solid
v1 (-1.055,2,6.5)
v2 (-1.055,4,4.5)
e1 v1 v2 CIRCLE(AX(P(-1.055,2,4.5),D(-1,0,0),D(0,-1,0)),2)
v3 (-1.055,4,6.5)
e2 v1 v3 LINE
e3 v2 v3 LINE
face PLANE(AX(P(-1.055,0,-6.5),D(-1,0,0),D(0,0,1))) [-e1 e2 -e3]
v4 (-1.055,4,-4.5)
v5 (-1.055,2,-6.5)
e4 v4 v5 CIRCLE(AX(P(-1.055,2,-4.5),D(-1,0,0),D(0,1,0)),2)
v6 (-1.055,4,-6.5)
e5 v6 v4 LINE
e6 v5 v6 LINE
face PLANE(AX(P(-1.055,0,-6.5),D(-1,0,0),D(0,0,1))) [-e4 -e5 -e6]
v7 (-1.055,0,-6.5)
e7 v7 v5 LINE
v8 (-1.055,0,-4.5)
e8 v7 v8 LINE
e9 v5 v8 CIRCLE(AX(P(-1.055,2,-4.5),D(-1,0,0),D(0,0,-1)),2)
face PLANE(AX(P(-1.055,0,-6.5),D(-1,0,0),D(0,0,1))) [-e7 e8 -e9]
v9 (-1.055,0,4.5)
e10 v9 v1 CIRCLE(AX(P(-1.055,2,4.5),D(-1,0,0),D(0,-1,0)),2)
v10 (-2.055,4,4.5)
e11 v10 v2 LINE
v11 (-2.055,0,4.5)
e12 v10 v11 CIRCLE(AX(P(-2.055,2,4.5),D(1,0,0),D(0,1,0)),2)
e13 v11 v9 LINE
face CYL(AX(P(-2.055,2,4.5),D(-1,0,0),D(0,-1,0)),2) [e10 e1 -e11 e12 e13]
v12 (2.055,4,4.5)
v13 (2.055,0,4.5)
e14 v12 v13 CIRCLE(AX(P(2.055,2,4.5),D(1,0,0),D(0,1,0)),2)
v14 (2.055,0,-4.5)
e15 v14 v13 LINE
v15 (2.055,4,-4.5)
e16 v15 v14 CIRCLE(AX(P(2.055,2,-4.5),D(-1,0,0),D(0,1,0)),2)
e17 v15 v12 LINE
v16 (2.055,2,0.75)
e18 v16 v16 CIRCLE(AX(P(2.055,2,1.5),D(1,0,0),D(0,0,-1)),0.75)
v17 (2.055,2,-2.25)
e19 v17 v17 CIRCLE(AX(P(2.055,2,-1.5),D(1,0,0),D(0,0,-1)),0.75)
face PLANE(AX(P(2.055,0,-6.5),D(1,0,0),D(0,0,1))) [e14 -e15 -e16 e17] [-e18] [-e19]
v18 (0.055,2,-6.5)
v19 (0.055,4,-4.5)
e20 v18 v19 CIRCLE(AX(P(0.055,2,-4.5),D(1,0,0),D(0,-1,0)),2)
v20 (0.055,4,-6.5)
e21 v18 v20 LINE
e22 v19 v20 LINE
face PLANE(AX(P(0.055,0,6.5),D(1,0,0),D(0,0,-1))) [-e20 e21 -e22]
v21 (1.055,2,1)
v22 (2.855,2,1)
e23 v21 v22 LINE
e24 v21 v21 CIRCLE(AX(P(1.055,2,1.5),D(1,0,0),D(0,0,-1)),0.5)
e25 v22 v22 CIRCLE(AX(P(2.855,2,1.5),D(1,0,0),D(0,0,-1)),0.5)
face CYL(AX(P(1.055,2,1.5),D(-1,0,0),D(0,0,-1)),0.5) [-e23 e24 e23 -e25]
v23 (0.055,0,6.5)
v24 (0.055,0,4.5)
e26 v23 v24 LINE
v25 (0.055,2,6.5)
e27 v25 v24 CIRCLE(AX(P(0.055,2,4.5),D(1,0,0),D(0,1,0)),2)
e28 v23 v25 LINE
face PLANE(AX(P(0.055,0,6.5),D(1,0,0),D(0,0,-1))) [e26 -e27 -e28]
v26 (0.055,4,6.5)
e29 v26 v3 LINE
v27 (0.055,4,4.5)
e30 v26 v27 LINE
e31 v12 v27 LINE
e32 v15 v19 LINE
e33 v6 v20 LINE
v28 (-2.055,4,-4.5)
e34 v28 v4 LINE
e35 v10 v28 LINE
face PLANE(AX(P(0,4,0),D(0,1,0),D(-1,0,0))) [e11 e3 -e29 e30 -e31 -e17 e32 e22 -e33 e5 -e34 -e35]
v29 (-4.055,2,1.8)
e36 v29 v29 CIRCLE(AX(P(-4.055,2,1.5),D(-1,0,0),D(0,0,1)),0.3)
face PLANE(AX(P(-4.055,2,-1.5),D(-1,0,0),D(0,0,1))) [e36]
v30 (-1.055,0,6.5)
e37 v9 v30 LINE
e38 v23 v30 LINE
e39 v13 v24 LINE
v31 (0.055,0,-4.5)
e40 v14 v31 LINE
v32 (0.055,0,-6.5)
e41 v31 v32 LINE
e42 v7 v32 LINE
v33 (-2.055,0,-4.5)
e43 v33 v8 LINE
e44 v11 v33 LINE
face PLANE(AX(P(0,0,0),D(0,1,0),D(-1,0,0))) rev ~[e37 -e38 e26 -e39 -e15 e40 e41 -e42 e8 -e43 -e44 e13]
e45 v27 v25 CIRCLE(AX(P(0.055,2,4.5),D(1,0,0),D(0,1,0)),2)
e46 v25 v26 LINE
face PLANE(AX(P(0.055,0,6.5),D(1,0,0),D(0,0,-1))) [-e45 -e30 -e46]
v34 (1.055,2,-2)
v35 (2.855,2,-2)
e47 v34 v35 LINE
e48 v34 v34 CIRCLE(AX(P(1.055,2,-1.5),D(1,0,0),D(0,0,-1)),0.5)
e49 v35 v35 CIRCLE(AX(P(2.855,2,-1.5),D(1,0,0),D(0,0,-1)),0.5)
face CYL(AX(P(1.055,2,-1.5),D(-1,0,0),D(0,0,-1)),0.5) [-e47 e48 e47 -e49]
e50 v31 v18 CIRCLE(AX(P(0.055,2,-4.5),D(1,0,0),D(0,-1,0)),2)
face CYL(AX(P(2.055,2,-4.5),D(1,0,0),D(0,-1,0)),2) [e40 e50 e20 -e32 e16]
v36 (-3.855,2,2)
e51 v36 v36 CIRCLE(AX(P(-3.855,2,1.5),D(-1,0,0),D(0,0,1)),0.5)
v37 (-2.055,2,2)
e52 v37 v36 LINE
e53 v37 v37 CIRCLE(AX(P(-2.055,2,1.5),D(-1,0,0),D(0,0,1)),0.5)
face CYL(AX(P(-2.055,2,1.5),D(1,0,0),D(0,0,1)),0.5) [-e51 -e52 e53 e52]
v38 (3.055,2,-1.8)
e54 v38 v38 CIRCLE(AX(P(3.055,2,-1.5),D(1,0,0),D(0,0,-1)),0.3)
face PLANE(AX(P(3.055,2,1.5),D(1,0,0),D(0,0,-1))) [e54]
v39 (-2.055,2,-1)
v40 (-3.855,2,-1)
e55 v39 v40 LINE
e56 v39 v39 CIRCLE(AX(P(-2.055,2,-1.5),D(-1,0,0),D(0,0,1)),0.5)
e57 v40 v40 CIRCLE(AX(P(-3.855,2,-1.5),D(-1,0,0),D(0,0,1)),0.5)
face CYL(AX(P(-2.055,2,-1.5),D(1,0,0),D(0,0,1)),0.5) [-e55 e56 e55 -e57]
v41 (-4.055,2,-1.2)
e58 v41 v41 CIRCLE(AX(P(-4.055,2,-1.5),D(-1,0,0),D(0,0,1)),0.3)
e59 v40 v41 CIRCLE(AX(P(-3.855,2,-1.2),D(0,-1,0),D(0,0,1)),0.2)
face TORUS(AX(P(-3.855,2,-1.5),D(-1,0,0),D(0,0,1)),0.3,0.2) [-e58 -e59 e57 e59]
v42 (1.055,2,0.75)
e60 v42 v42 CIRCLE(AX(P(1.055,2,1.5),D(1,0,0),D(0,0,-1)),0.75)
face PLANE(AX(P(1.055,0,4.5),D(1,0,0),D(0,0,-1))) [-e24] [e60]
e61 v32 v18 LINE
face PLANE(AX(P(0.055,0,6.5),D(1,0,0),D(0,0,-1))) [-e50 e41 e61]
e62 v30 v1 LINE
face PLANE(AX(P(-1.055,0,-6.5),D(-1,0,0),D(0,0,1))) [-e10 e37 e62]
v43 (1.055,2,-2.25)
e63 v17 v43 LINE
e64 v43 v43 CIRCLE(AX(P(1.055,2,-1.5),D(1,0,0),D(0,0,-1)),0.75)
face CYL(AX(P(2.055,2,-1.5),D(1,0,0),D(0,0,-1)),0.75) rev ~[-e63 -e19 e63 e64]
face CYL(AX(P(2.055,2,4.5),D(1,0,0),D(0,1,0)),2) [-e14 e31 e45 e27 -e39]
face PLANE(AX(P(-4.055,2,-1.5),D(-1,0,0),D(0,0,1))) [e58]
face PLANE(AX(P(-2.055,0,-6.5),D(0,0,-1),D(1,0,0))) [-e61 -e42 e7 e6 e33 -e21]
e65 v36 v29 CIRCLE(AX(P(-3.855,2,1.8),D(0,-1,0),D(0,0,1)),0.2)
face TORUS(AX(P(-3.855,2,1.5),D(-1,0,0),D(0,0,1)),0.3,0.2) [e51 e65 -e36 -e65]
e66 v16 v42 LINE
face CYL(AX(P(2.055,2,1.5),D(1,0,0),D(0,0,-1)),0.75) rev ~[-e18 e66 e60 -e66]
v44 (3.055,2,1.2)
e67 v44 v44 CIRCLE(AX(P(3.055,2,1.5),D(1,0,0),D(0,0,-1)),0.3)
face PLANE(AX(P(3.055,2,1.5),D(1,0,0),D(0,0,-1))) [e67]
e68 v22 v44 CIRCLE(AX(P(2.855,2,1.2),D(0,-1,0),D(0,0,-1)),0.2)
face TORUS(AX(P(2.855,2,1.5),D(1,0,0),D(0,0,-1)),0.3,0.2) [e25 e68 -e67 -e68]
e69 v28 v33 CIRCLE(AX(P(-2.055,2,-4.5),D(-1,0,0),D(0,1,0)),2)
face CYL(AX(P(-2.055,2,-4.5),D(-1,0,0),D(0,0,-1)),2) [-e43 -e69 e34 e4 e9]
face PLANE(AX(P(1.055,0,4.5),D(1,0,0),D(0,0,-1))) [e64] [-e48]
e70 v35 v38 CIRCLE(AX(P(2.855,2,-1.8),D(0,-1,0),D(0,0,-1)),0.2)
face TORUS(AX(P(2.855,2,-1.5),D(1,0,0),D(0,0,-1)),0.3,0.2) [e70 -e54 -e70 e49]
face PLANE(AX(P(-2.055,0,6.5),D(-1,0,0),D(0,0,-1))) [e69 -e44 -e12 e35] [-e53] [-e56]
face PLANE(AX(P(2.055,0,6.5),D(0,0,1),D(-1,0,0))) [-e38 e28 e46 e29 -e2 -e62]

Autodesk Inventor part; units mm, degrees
ref_plane "YZ Plane" through (0, 0, 0) normal (1, 0, 0) x (0, 1, 0)
ref_plane "XZ Plane" through (0, 0, 0) normal (0, 1, 0) x (-1, 0, 0)
ref_plane "XY Plane" through (0, 0, 0) normal (0, 0, 1) x (1, 0, 0)
sketch "Sketch1" plane through (0, 0, 0) normal (0, 1, 0) x (-1, 0, 0)
  line L0 (-2.055, 6.5) -> (2.055, 6.5)
  line L1 (2.055, 6.5) -> (2.055, -6.5)
  line L2 (2.055, -6.5) -> (-2.055, -6.5)
  line L3 (-2.055, -6.5) -> (-2.055, 6.5)
  line L4 (-2.055, 6.5) -> (2.055, -6.5) construction
  line L5 (2.055, 6.5) -> (-2.055, -6.5) construction
  point P0 (0, 0)
  dimension "d0" = 4.11
  dimension "d1" = 13
extrude "Extrusion1" add sketch "Sketch1" along normal blind 4
sketch "Sketch2" plane through (2.055, 0, 6.5) normal (1, 0, 0) x (0, 0, -1)
  line L0 (0, 0) -> (0, 4) projected
  line L1 (0, 2) -> (13, 2) construction
  line L2 (13, 0) -> (13, 4) projected
  line L3 (2, 0) -> (11, 0)
  line L4 (11, 4) -> (2, 4)
  arc A0 (2, 4) -> (2, 0) centre (2, 2) ccw
  arc A1 (11, 0) -> (11, 4) centre (11, 2) ccw
  line L5 (0, 4) -> (13, 4) projected
  line L6 (0, 0) -> (13, 0) projected
  point P0 (6.5, 0)
  point P1 (6.5, 2)
extrude "Extrusion2" cut sketch "Sketch2" against normal blind 2 contours L0 A0 L6 | L0 L5 A0 | A1 L2 L6 | L5 L2 A1
sketch "Sketch3" plane through (-2.055, 0, -6.5) normal (-1, 0, 0) x (0, 0, 1)
  arc A0 (2, 4) -> (0, 2) centre (2, 2) ccw projected
  line L0 (0, 0) -> (0, 4) projected
  line L1 (0, 4) -> (13, 4) projected
  arc A1 (0, 2) -> (2, 0) centre (2, 2) ccw projected
  arc A2 (2, 4) -> (2, 0) centre (2, 2) ccw projected
  line L2 (11, 4) -> (2, 4) projected
  arc A3 (11, 0) -> (11, 4) centre (11, 2) ccw projected
  line L3 (11, 0) -> (2, 0) projected
  line L4 (13, 0) -> (13, 4) projected
  line L5 (0, 0) -> (13, 0) projected
  point P0 (6.5, 0)
  point P1 (13, 2)
extrude "Extrusion3" cut sketch "Sketch3" against normal blind 1 contours A0 L0 L1 | A1 L5 L0 | L1 L4 A3 | L4 L5 A3
sketch "Sketch4" plane through (-2.055, 0, -4.5) normal (-1, 0, 0) x (0, 0, 1)
  arc A0 (0, 4) -> (-2, 2) centre (0, 2) ccw projected
  circle A1 centre (0, 2) radius 1.5
  arc A2 (11, 2) -> (9, 4) centre (9, 2) ccw projected
  circle A3 centre (9, 2) radius 1.5
  point P0 (4.5, 0)
  dimension "d8" = 3
  dimension "d9" = 3
mark "Mark1"
sketch "Sketch5" plane through (-2.055, 0, -4.5) normal (-1, 0, 0) x (0, 0, 1)
  circle A0 centre (3, 2) radius 1
  circle A1 centre (0, 2) radius 1.5 projected
  circle A2 centre (9, 2) radius 1.5 projected
  line L0 (0, 4) -> (9, 4) projected
  circle A3 centre (6, 2) radius 1
  point P0 (4.5, 0)
  dimension "d10" = 2
  dimension "d11" = 3
  dimension "d12" = 9
  dimension "d15" = 3
mark "Mark2"
sketch "Sketch6" plane through (-2.055, 2, -1.5) normal (-1, 0, 0) x (0, 0, 1)
  circle A0 centre (0, 0) radius 1 projected
  circle A1 centre (0, 0) radius 0.5
  circle A2 centre (3, 0) radius 1 projected
  circle A3 centre (3, 0) radius 0.5
  point P0 (1.5, -2)
  dimension "d20" = 1
  dimension "d21" = 1
extrude "Extrusion4" add sketch "Sketch6" along normal blind 2 contours A1 | A3
sketch "Sketch7" plane through (2.055, 0, 4.5) normal (1, 0, 0) x (0, 0, -1)
  circle A0 centre (0, 2) radius 1.5 projected
  circle A1 centre (9, 2) radius 1.5 projected
  point P0 (4.5, 0)
mark "Mark3"
sketch "Sketch8" plane through (2.055, 0, 4.5) normal (1, 0, 0) x (0, 0, -1)
  circle A0 centre (6, 2) radius 1 projected
  circle A1 centre (3, 2) radius 1 projected
  circle A2 centre (3, 2) radius 0.75
  circle A3 centre (6, 2) radius 0.75
  point P0 (4.5, 0)
  dimension "d24" = 1.5
  dimension "d25" = 1.5
extrude "Extrusion5" cut sketch "Sketch8" against normal blind 1 contours A2 | A3
sketch "Sketch9" plane through (1.055, 2, 1.5) normal (1, 0, 0) x (0, 0, -1)
  circle A0 centre (3, 0) radius 0.5 projected
  circle A1 centre (0, 0) radius 0.5 projected
  point P0 (1.5, -2)
extrude "Extrusion6" add sketch "Sketch9" along normal blind 2
fillet "Fillet1" radius 0.2 4 edges at (3.055, 2, 2) (3.055, 2, -1) (-4.055, 2, -2) (-4.055, 2, 1)
equation "\"d9\" = d8"
equation "\"d11\" = 0.333333 * d12"
equation "\"d15\" = d11"
equation "\"d21\" = d20"
equation "\"d25\" = d24"
properties part number "2_pin_no_ear_male"
